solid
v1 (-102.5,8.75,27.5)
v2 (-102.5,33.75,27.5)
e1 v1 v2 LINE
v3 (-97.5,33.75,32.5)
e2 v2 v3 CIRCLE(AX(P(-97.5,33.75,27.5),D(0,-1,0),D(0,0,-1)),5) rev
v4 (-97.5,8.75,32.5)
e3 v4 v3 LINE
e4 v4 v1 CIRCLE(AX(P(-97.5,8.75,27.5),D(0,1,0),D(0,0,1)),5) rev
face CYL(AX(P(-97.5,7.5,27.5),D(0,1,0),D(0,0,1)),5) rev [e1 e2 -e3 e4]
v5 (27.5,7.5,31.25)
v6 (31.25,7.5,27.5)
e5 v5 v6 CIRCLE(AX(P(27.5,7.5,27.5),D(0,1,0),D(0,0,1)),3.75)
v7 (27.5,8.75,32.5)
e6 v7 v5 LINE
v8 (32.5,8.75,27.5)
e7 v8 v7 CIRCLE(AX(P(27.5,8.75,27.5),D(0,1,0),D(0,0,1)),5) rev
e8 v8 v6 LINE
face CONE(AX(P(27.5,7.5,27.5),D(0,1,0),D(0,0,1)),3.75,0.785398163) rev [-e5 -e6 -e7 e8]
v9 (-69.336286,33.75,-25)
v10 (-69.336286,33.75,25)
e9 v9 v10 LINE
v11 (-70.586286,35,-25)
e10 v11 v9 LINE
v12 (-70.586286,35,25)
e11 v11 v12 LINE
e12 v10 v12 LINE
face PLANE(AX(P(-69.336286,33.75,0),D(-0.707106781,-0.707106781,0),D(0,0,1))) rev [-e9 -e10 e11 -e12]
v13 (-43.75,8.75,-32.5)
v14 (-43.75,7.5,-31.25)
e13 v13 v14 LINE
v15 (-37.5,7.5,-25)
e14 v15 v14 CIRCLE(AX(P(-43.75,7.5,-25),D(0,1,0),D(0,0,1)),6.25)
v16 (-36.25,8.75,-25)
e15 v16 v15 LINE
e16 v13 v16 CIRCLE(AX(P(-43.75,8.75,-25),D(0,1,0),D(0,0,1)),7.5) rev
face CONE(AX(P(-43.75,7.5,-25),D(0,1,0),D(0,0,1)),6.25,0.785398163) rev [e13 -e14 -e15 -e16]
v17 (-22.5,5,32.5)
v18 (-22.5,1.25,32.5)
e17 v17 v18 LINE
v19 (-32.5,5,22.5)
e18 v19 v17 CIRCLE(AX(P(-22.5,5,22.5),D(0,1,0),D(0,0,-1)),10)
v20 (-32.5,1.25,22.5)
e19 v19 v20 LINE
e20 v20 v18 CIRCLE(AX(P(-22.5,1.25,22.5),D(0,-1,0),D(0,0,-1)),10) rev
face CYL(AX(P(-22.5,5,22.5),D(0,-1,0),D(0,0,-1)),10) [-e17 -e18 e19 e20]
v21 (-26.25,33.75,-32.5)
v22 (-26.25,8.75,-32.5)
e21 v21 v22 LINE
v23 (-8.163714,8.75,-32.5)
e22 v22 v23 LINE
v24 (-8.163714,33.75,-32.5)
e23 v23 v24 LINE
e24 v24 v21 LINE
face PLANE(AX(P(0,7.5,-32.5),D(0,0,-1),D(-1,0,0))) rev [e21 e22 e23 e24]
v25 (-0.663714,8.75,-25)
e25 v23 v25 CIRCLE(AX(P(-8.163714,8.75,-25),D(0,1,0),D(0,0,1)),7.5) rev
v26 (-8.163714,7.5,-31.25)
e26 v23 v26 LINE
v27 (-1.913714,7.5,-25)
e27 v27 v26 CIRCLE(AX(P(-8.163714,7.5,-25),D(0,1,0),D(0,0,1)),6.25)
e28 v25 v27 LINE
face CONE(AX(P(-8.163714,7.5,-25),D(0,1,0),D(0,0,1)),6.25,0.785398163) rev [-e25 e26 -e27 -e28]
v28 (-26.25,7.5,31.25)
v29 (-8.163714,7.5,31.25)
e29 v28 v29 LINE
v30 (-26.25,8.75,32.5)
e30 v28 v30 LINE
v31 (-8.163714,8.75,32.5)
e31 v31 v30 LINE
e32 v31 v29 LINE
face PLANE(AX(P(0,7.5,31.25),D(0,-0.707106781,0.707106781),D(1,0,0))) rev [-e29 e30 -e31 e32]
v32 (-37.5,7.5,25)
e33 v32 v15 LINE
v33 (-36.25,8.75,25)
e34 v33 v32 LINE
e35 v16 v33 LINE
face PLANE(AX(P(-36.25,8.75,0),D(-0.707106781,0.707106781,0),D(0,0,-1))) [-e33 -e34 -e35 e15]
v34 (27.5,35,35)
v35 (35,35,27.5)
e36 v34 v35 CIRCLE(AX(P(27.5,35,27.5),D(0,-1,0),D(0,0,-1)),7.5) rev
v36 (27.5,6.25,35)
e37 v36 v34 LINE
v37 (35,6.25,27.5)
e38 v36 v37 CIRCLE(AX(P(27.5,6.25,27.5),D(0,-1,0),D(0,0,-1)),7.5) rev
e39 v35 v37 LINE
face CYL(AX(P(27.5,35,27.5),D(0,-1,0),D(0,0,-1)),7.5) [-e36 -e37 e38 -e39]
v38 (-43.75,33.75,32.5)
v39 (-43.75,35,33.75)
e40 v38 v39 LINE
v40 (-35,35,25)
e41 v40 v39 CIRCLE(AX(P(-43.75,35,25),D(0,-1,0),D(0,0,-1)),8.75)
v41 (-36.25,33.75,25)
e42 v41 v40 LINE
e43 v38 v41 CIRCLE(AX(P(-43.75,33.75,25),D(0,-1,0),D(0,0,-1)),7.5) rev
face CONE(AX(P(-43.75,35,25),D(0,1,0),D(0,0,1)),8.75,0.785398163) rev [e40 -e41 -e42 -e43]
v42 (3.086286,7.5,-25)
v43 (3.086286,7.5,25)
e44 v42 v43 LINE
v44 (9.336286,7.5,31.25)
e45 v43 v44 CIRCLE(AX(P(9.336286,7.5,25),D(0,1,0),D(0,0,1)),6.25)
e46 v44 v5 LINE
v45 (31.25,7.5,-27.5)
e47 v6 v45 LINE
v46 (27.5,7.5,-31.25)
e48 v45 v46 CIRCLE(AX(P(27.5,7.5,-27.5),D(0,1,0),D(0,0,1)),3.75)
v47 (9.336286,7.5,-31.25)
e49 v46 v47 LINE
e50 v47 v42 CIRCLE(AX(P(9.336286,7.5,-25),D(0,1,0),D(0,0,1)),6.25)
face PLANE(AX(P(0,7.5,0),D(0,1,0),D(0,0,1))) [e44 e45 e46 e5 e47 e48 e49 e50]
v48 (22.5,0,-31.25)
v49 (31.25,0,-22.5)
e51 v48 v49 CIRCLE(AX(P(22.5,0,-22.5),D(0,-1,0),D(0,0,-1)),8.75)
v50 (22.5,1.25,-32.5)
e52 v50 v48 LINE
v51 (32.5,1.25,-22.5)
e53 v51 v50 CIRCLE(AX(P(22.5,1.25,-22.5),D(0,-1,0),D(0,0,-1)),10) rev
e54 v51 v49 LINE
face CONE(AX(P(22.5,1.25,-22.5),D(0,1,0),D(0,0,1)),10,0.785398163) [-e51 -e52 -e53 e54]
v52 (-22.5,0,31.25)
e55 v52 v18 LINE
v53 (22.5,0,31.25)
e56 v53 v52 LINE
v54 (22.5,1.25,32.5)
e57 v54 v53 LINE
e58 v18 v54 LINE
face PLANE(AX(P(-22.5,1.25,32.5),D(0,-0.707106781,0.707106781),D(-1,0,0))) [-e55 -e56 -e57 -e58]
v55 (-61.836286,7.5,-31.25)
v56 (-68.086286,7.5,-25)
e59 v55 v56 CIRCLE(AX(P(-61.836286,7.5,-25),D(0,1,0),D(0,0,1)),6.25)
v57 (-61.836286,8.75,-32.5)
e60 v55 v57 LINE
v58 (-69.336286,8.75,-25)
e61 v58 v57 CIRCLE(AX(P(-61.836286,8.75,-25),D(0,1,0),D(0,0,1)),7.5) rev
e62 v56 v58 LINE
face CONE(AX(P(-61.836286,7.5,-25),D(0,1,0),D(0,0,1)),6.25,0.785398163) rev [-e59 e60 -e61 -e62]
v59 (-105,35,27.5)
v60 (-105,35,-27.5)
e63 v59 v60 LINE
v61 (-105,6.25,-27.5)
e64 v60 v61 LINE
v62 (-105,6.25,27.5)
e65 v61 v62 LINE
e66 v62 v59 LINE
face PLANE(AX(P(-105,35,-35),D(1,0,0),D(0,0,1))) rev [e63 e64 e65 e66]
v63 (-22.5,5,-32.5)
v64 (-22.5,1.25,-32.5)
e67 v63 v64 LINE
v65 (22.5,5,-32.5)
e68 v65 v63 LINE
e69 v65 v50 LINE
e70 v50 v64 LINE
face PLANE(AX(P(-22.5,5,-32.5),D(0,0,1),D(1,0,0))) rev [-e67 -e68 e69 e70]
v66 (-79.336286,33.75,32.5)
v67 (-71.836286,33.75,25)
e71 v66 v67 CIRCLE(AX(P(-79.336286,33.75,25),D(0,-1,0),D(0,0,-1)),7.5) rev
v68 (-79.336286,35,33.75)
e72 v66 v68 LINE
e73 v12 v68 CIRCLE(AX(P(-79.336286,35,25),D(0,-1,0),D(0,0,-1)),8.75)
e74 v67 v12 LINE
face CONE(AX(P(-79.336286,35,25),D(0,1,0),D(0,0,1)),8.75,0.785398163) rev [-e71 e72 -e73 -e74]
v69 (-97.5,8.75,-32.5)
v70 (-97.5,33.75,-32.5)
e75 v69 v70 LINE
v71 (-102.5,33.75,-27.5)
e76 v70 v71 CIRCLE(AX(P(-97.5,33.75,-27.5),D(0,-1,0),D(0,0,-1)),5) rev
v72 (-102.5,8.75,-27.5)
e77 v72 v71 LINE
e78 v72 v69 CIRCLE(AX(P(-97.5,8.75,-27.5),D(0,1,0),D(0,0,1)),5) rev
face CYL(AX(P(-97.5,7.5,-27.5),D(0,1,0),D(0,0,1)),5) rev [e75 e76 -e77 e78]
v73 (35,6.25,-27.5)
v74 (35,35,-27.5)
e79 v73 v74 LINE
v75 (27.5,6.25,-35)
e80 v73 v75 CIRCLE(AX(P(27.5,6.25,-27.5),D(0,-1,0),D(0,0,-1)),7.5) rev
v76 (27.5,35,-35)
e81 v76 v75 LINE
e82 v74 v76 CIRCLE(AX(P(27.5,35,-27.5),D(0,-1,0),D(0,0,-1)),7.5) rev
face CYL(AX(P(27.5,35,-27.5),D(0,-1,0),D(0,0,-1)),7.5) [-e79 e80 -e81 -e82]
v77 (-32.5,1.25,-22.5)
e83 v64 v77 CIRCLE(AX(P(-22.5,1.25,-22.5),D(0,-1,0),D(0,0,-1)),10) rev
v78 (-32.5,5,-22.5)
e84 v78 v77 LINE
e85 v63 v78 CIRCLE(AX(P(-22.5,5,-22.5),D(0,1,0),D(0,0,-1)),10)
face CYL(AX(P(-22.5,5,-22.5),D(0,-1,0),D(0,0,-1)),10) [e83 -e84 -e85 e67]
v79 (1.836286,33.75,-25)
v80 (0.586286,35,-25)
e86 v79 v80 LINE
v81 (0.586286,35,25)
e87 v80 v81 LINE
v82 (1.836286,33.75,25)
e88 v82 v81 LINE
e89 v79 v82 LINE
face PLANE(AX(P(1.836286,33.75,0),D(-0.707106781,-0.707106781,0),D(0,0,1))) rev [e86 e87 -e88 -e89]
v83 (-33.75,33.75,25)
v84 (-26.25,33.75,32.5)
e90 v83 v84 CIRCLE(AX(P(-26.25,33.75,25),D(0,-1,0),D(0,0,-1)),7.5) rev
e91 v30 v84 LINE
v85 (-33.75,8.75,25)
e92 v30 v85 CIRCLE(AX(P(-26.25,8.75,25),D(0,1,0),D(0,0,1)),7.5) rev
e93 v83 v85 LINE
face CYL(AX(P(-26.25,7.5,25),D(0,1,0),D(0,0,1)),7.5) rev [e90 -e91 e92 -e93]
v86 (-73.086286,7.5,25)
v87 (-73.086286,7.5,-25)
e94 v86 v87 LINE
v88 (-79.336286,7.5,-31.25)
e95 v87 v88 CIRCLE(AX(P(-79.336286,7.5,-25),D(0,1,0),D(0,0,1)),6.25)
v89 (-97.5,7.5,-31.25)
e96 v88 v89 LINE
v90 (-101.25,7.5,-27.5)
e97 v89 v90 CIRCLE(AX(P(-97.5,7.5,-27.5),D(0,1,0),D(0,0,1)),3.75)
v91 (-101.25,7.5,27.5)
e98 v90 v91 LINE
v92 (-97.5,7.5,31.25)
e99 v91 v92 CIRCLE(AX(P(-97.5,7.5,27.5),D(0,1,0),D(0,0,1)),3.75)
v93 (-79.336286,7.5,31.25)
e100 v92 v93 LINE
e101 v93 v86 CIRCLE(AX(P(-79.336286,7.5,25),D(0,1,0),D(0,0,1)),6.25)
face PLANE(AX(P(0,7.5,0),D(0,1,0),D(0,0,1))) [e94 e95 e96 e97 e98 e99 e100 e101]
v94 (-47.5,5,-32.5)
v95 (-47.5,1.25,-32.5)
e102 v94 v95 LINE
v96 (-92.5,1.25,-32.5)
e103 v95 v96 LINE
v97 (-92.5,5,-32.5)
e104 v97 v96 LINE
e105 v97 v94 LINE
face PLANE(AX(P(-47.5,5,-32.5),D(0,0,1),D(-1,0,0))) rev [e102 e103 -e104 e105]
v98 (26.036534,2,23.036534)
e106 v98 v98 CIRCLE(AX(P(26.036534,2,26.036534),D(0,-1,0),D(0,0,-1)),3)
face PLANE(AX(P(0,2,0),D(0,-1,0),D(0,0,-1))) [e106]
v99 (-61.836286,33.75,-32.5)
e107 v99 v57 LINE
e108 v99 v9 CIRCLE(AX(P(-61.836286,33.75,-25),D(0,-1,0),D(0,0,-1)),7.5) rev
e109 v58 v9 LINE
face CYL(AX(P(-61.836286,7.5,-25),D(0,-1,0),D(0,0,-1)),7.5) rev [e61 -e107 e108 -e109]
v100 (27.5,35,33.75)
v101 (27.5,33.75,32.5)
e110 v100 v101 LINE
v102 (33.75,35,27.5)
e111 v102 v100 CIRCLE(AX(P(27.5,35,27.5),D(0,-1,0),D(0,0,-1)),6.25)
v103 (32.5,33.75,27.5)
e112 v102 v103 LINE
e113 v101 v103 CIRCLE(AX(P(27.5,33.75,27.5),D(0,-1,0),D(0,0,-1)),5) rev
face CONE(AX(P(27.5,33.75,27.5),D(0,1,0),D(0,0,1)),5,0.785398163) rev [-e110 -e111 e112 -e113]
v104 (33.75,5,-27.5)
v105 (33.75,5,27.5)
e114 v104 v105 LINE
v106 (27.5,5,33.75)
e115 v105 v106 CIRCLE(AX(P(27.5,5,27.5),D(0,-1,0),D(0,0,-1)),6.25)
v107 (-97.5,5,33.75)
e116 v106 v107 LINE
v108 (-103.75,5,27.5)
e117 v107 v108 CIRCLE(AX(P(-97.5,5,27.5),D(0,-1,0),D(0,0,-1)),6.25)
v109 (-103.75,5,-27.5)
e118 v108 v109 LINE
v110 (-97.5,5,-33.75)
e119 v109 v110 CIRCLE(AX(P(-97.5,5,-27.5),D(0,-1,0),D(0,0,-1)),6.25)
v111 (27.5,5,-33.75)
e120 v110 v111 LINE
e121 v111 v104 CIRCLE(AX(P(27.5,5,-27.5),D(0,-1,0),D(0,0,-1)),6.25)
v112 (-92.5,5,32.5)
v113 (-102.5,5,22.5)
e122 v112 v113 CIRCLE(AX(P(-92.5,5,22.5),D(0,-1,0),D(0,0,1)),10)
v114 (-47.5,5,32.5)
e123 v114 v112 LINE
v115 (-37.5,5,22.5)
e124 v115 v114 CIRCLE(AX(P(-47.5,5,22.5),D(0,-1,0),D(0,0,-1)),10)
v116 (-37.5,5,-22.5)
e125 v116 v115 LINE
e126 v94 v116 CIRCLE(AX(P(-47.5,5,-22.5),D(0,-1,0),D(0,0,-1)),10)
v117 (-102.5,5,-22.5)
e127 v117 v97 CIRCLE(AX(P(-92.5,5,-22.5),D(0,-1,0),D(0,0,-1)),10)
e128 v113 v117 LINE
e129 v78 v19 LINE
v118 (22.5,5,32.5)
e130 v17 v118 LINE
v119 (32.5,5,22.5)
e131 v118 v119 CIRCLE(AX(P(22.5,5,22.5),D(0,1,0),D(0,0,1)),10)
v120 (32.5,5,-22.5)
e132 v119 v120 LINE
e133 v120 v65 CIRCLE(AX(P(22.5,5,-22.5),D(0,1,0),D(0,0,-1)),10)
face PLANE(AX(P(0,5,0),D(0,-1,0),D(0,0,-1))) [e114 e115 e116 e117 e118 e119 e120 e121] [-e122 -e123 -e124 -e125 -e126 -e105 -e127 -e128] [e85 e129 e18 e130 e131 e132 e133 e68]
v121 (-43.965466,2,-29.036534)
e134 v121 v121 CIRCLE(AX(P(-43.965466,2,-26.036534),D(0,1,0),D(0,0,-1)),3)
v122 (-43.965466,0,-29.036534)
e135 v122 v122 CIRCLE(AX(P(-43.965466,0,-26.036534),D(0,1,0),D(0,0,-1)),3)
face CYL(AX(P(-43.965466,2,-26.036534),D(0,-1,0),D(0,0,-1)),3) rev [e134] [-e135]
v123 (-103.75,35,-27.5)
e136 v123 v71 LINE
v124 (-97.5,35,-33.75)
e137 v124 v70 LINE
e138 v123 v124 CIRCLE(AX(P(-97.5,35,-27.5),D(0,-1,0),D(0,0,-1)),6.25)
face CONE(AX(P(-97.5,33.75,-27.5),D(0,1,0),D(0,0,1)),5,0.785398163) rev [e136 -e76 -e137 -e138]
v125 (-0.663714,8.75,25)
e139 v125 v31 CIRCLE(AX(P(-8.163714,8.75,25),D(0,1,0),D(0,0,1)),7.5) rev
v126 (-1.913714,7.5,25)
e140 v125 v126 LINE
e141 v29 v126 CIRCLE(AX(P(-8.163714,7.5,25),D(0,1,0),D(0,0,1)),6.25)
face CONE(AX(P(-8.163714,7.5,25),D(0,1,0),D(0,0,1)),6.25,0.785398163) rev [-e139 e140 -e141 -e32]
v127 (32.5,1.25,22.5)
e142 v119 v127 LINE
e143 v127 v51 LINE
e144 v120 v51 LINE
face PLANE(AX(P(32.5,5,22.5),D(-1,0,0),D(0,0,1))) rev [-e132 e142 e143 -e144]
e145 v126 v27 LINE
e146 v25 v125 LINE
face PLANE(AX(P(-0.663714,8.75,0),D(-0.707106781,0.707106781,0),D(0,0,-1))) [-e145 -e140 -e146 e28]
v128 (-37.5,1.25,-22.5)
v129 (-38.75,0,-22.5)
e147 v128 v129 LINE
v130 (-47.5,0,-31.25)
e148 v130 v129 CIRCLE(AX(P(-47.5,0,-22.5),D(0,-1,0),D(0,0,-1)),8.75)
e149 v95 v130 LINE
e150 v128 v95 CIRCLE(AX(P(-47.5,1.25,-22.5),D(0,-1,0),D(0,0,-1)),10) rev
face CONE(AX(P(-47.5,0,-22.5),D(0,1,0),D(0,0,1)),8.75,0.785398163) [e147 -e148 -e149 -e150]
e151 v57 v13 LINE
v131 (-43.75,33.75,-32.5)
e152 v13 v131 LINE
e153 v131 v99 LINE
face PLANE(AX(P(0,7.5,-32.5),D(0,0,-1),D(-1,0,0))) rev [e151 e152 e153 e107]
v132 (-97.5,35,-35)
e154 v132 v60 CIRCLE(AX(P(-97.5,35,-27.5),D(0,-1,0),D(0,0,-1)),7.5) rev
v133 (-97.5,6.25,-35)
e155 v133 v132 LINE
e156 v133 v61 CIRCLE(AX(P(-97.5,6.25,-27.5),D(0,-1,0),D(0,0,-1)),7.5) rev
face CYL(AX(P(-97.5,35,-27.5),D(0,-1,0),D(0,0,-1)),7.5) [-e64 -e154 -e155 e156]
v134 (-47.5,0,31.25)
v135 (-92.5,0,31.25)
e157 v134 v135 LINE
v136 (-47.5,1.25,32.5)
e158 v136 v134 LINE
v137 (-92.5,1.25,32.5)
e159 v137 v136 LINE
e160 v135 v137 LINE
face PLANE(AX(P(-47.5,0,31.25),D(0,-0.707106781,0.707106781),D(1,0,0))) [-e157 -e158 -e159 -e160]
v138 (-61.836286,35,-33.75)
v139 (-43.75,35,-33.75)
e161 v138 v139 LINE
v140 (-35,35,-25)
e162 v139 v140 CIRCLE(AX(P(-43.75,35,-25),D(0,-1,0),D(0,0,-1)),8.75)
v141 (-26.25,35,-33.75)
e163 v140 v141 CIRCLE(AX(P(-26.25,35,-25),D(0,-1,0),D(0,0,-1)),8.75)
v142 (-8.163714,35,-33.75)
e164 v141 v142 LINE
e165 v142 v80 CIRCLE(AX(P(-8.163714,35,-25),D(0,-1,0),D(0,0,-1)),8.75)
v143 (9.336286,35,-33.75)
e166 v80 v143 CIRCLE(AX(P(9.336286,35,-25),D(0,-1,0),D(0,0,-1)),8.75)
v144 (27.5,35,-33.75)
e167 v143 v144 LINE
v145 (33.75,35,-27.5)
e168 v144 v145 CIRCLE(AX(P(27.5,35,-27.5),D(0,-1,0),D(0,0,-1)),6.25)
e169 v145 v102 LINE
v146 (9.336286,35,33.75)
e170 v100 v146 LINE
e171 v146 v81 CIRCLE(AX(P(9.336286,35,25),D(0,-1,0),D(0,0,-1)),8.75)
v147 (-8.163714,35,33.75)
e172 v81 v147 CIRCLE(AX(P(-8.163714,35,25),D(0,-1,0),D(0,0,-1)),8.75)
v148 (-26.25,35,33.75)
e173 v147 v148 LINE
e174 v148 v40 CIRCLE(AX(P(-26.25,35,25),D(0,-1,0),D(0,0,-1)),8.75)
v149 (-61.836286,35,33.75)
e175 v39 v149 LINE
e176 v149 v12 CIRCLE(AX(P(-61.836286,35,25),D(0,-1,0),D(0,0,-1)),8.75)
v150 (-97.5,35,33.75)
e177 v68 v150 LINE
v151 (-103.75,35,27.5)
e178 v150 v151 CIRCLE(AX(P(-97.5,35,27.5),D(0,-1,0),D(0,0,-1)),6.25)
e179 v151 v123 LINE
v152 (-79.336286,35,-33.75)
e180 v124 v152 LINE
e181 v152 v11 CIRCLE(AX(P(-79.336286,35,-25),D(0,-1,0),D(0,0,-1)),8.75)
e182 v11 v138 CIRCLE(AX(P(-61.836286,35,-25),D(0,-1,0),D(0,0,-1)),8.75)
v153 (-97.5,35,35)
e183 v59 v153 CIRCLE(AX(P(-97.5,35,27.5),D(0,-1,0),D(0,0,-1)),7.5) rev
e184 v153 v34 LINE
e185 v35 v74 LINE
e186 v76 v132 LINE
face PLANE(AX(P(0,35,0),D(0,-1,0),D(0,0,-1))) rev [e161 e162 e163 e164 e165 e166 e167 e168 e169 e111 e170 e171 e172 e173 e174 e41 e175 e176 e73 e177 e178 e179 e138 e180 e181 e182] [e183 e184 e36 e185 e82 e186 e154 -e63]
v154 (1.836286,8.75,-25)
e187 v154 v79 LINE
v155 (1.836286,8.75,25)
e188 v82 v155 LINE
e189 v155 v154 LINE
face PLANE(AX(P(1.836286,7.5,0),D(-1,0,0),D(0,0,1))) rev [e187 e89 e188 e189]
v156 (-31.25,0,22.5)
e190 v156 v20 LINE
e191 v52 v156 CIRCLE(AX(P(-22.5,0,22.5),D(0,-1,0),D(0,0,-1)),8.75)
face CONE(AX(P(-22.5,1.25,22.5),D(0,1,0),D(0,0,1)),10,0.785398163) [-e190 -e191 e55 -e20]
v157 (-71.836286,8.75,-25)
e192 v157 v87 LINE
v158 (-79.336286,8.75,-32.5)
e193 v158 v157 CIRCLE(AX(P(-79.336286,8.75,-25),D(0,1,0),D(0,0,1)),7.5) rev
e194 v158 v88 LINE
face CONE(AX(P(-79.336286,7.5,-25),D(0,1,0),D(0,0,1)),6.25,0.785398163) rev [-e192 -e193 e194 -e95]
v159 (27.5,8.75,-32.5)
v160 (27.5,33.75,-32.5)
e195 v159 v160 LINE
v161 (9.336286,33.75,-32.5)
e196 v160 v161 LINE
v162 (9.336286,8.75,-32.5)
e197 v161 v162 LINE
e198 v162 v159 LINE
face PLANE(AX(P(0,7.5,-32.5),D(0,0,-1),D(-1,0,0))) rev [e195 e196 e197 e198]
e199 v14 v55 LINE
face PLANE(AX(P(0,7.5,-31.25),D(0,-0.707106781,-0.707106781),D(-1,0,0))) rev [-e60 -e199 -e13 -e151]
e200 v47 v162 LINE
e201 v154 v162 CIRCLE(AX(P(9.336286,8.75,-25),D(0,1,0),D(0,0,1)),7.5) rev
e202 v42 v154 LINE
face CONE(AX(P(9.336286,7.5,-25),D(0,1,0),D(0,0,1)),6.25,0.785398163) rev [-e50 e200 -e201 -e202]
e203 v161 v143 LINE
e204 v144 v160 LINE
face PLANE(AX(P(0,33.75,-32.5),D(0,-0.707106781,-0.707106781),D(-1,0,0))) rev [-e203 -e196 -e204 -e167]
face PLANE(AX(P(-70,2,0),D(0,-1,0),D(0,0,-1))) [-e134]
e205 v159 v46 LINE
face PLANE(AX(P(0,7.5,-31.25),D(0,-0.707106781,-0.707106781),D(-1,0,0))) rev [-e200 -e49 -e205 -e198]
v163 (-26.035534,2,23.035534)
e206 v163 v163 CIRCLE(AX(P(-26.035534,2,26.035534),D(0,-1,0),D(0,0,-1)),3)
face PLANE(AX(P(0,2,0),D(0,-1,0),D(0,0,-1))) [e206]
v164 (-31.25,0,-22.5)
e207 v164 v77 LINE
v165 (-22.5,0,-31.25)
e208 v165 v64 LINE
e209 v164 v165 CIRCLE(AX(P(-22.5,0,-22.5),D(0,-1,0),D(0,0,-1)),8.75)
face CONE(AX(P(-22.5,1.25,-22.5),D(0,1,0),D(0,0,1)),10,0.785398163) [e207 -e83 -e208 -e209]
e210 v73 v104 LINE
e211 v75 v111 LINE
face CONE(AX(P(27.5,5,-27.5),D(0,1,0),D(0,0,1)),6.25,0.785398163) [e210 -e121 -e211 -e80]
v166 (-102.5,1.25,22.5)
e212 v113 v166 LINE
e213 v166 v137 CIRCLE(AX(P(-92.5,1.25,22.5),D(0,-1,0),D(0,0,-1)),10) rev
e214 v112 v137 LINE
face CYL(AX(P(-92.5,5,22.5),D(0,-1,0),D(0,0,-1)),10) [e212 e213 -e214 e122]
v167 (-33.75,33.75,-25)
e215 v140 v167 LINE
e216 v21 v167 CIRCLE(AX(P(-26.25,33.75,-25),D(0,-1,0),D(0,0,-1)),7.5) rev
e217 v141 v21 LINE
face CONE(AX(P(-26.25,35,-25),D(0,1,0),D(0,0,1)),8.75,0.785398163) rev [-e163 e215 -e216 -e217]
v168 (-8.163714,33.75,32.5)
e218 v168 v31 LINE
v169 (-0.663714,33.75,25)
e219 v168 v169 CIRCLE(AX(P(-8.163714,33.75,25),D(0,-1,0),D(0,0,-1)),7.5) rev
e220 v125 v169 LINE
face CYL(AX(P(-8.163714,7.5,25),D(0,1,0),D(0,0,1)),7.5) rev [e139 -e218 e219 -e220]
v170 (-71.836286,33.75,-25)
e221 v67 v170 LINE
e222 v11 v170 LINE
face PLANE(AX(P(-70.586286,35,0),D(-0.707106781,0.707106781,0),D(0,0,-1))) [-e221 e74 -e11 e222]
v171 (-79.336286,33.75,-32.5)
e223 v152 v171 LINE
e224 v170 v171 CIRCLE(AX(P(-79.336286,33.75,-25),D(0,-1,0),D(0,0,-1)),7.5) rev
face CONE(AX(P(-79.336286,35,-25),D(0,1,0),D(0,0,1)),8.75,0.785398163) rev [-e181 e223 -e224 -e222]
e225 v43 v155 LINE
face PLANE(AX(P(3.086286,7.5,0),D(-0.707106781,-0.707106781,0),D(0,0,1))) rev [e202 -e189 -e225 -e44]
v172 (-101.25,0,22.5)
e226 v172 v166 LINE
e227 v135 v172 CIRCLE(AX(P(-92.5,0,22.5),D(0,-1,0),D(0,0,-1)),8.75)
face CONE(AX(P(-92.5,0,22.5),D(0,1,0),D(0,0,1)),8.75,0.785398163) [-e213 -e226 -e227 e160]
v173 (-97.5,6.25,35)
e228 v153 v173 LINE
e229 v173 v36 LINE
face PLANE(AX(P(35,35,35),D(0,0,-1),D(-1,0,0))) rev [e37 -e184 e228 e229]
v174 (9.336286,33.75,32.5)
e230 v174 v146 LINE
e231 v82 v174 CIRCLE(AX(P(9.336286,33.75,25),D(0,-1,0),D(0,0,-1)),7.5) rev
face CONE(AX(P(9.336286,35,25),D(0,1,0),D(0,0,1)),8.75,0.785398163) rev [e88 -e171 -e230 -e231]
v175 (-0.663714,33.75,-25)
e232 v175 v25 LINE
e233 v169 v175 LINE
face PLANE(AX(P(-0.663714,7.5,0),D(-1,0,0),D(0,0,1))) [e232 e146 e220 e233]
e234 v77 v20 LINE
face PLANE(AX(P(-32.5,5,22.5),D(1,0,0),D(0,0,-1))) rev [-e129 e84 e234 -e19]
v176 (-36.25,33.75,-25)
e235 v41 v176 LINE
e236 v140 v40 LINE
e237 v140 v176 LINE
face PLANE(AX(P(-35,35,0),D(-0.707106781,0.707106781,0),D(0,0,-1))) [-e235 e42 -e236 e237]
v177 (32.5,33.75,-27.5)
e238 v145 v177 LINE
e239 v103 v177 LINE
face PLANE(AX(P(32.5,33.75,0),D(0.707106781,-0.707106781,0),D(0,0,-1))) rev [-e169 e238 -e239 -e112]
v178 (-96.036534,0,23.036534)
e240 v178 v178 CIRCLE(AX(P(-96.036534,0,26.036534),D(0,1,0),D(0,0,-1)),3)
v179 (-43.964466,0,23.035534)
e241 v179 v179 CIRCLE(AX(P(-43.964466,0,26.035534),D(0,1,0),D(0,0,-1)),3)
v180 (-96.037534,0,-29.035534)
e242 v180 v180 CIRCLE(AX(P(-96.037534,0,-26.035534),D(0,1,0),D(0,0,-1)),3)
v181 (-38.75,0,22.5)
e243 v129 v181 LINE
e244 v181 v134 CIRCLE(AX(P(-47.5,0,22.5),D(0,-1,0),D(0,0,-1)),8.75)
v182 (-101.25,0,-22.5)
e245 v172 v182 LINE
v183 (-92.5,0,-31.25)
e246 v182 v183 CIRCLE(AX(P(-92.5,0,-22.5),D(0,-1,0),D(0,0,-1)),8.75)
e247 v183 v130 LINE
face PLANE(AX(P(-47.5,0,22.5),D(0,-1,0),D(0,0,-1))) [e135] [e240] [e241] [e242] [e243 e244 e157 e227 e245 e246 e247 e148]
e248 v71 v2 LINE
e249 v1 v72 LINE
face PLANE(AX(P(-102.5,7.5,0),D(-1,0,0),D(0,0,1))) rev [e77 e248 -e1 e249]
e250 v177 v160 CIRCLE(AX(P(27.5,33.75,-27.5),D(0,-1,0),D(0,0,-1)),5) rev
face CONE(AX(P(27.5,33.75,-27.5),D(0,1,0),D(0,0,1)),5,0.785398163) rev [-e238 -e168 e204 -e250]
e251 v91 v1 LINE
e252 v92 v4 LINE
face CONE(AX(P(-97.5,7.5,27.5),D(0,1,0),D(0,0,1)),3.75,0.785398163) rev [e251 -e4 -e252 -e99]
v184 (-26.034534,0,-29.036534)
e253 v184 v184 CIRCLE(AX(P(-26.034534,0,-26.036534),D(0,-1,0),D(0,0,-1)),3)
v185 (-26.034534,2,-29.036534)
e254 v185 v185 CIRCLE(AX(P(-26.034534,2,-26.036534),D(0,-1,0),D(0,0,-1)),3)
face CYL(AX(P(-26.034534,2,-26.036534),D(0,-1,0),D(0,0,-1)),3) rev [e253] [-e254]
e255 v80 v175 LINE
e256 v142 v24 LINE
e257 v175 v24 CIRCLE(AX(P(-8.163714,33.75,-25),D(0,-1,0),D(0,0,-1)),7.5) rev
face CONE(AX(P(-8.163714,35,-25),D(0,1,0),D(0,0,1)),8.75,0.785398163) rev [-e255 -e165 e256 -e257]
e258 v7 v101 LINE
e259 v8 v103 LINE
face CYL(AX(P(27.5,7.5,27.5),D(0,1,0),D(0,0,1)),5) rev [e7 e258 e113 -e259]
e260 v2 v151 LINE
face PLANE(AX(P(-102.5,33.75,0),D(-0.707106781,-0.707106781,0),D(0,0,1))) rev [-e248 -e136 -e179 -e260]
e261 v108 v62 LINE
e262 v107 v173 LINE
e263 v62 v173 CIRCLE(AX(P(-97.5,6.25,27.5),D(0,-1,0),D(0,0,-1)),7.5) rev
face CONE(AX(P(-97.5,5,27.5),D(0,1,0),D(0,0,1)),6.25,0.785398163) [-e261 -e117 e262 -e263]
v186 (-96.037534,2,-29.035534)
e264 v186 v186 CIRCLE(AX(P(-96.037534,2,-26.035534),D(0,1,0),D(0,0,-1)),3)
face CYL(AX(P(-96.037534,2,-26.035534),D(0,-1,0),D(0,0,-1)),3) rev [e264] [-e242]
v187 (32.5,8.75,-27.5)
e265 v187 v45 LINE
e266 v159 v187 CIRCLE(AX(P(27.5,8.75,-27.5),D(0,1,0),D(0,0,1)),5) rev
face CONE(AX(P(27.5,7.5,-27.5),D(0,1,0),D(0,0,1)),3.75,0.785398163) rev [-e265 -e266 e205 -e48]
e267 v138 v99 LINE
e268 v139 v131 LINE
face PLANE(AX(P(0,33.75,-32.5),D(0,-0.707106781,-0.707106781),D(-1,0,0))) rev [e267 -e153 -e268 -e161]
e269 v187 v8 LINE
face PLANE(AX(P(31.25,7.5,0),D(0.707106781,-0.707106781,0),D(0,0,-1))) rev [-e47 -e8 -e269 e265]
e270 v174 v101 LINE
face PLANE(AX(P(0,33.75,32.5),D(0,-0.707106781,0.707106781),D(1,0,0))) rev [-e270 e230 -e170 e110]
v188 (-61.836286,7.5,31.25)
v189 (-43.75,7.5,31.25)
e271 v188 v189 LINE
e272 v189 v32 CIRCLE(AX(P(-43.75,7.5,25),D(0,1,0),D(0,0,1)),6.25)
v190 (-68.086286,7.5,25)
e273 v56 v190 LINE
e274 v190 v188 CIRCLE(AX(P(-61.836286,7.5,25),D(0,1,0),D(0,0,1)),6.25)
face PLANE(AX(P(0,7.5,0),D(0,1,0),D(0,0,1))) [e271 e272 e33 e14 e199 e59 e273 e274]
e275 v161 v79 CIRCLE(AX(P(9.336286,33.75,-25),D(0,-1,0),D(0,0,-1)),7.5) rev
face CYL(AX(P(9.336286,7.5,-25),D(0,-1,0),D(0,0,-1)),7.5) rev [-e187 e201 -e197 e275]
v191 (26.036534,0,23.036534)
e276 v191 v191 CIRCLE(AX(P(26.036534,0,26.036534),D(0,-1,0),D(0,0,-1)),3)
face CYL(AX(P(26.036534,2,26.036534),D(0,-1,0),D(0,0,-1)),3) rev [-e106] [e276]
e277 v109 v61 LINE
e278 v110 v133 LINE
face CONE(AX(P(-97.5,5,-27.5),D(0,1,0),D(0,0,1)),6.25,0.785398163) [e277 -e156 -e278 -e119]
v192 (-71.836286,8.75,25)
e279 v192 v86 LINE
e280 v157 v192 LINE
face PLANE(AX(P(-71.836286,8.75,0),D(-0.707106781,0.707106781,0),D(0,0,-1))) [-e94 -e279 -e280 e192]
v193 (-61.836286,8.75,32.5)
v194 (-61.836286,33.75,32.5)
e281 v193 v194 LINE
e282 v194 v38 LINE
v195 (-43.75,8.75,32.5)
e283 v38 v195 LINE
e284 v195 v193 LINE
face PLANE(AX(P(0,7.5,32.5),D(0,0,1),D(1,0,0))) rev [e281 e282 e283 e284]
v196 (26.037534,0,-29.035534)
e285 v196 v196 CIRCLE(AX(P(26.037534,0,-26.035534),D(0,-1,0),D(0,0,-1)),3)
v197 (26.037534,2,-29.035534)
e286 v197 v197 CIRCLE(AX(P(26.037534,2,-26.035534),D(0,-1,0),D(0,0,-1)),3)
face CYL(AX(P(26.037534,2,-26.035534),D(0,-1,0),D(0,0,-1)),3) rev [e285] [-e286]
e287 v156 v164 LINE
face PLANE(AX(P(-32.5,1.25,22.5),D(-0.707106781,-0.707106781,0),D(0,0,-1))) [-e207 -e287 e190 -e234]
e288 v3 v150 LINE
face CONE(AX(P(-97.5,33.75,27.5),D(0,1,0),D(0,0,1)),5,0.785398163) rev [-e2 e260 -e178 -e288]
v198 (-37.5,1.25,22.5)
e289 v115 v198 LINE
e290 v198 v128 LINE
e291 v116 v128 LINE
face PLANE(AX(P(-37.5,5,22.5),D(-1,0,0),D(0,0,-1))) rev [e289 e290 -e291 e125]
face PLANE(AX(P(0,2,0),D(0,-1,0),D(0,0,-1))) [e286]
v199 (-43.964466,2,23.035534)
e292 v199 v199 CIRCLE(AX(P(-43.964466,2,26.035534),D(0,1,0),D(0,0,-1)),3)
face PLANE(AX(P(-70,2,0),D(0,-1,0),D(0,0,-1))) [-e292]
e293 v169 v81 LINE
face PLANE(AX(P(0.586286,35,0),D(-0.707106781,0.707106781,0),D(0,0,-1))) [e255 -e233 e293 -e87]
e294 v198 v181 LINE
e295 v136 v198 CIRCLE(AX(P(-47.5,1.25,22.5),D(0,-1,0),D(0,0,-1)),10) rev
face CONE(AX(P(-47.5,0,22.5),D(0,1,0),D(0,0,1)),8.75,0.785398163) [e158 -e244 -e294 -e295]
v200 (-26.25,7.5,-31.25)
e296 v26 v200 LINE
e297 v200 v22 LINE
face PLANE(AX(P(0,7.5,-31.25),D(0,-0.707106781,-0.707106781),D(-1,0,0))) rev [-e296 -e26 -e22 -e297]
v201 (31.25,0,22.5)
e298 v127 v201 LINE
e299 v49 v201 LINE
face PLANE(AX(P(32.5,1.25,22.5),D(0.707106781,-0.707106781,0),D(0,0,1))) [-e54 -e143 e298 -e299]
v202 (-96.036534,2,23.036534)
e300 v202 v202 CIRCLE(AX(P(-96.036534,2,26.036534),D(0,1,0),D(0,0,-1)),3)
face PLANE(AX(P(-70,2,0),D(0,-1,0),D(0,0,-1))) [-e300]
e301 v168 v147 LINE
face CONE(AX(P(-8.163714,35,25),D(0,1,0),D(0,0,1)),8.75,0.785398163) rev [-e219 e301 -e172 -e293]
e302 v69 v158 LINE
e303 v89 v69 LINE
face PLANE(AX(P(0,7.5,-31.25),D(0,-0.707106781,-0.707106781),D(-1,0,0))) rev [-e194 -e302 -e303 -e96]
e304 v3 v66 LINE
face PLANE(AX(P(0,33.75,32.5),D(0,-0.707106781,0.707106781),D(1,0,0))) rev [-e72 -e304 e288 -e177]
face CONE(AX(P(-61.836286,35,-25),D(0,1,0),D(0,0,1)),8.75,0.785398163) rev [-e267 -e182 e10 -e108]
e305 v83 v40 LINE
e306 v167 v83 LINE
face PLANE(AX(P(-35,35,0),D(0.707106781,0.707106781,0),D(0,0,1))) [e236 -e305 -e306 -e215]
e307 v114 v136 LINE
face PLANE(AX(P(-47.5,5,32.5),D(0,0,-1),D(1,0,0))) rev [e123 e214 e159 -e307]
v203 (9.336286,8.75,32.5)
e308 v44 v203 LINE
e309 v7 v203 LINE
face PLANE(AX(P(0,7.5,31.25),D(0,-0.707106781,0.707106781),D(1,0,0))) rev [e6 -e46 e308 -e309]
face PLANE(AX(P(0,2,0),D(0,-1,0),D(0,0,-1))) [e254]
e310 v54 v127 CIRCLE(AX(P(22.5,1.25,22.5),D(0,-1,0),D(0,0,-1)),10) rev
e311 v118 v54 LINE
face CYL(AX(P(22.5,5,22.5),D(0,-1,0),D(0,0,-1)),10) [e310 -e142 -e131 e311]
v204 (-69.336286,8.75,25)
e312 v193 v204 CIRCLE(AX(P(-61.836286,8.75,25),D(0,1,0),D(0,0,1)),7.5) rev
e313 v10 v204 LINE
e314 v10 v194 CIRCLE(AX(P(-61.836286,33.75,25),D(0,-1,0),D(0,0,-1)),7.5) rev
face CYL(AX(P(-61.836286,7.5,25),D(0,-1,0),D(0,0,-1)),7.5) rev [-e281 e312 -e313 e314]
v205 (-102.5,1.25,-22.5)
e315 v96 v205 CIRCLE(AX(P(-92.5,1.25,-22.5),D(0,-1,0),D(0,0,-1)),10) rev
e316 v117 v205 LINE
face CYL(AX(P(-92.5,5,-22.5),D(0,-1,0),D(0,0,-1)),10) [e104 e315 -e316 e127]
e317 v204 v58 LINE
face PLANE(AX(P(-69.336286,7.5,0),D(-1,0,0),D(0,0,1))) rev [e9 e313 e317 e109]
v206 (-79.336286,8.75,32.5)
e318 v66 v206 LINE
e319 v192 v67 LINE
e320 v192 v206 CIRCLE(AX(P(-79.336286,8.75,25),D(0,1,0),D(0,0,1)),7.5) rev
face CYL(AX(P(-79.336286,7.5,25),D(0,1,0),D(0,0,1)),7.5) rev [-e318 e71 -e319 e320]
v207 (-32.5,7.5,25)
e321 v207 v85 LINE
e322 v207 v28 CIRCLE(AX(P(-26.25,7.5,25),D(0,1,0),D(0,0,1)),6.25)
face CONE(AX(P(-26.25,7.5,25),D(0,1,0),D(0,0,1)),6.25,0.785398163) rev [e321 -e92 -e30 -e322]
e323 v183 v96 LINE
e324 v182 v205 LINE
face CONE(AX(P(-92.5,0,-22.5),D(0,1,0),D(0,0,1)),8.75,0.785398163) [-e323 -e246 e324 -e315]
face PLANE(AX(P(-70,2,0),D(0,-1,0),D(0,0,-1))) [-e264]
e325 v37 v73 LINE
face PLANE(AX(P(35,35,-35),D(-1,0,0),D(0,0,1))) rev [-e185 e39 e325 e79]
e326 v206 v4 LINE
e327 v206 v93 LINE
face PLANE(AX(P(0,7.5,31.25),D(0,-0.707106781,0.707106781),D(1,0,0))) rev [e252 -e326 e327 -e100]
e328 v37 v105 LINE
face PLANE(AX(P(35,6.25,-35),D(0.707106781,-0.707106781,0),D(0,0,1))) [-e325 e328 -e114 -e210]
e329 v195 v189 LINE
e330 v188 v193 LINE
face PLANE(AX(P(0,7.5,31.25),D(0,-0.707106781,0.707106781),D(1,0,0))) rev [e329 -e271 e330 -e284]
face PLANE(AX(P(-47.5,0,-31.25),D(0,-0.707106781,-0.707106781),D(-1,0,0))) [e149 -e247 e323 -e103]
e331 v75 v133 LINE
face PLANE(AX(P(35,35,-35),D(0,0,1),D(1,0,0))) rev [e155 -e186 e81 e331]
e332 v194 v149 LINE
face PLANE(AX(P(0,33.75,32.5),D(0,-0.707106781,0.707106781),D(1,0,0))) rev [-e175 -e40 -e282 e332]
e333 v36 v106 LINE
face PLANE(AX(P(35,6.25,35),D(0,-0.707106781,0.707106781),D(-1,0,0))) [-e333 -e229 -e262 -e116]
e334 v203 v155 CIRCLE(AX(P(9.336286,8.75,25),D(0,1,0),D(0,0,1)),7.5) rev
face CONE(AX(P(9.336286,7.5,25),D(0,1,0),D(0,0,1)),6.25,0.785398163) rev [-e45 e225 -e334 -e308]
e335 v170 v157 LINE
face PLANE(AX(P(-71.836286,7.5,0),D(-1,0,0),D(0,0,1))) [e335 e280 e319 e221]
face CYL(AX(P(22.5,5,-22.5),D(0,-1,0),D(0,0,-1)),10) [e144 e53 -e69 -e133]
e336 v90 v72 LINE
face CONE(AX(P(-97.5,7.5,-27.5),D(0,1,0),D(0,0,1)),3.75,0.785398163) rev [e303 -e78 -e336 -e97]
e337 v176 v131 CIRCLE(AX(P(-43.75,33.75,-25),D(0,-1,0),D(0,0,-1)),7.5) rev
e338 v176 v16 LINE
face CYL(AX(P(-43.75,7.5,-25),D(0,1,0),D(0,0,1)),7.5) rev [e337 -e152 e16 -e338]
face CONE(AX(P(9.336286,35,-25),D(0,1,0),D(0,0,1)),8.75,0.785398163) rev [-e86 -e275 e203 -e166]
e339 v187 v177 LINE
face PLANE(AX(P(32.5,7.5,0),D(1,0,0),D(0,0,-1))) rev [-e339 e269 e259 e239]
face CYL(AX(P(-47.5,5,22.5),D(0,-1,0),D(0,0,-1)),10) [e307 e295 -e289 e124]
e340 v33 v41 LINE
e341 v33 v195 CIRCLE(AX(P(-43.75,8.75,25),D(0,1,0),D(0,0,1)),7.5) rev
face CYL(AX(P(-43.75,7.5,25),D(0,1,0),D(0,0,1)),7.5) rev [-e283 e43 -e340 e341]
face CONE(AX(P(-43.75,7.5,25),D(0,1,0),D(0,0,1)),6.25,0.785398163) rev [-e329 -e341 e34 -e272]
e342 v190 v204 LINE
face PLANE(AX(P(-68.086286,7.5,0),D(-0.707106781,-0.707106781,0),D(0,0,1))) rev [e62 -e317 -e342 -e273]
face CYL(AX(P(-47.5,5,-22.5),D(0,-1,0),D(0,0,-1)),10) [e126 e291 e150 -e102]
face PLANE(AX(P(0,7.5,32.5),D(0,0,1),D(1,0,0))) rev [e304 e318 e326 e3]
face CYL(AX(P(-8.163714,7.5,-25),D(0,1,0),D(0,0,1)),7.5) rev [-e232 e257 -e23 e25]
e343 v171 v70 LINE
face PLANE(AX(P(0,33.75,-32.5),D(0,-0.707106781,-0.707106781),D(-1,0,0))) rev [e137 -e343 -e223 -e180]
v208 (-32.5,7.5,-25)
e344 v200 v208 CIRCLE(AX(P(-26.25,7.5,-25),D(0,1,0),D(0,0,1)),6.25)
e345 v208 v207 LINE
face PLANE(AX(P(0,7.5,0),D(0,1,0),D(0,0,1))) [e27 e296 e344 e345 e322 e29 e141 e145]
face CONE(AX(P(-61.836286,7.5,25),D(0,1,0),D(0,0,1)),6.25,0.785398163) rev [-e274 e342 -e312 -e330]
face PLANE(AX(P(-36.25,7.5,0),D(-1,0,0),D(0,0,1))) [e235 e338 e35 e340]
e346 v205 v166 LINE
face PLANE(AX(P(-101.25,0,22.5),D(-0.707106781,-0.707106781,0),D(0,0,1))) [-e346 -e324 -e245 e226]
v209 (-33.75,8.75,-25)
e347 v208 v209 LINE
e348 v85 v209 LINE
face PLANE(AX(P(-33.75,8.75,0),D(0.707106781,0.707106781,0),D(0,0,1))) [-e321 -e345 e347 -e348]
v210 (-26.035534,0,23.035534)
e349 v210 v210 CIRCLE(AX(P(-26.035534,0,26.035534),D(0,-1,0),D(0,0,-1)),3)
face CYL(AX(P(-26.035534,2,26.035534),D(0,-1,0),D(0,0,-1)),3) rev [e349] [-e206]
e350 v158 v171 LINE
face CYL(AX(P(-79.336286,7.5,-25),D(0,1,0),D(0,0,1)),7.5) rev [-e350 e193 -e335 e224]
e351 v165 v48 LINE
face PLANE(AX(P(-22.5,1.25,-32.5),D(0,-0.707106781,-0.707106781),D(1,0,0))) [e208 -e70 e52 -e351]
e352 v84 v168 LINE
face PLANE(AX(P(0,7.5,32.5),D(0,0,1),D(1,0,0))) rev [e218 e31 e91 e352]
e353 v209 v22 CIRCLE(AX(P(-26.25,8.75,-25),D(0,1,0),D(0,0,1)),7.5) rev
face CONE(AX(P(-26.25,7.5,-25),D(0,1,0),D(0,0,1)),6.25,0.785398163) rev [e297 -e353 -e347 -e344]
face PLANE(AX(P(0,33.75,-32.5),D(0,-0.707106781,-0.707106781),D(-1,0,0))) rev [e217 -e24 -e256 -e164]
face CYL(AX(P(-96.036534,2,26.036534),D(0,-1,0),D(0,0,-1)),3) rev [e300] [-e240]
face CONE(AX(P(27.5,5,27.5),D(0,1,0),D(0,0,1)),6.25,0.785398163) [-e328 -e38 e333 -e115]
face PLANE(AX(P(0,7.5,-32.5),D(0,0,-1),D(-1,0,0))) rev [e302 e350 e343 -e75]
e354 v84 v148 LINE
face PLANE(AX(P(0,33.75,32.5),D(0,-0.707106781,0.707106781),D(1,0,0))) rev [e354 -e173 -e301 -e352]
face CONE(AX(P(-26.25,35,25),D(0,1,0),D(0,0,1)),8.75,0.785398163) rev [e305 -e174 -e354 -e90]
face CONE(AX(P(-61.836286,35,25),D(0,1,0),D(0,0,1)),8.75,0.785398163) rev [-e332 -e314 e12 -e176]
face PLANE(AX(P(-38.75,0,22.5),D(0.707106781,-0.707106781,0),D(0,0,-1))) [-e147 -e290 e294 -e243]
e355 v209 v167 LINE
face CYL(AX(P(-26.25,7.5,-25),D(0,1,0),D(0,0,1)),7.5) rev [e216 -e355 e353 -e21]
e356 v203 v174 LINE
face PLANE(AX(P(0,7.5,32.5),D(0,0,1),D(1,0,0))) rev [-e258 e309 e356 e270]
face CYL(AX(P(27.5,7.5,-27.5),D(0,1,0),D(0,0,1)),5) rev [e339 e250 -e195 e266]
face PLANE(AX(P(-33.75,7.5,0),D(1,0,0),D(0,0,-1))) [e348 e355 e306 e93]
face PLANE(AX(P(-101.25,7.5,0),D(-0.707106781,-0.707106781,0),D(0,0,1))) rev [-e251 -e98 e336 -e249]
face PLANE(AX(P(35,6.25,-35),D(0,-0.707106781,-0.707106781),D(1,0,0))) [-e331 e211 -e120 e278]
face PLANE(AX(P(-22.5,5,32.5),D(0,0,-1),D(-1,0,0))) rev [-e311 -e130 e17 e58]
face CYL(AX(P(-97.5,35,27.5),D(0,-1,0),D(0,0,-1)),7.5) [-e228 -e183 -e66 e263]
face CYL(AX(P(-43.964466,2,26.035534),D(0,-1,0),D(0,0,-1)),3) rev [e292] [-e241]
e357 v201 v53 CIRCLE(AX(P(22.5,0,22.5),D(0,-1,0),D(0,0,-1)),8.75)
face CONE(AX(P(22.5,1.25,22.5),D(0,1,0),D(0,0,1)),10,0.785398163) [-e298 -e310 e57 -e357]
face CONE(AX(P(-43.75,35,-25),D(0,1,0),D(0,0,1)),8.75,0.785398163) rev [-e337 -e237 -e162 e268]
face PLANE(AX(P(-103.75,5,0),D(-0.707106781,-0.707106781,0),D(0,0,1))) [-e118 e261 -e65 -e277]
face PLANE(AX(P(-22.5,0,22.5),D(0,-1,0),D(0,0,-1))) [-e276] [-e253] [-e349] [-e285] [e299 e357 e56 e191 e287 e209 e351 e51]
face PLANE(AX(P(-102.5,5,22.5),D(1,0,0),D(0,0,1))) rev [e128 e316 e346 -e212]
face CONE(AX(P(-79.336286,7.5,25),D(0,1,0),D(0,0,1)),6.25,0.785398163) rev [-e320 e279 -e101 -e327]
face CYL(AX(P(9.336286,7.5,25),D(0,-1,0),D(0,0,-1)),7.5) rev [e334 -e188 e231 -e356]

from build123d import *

# Parameters (mm, degrees)
BOSS_EXTRUDE4_DEPTH = 5
SKETCH6_W           = 70
SKETCH6_H           = 70
BOSS_EXTRUDE5_DEPTH = 30
SKETCH8_R           = 3
CUT_EXTRUDE1_DEPTH  = 2
FILLET1_R           = 7.5
SKETCH13_W          = 33.08628573
SKETCH13_H          = 65
CUT_EXTRUDE2_DEPTH  = 27.5
FILLET2_R           = 7.5
CHAMFER1_SIZE       = 1.25
CHAMFER2_SIZE       = 1.25


with BuildPart() as part:
    # Sketch5 → Boss-Extrude4 (new body)
    with BuildSketch(Plane(origin=(0, 0, 0), x_dir=(1, 0, 0), z_dir=(0, 1, 0))):
        with BuildLine():
            Line((-22.5, -32.5), (22.5, -32.5))
            ThreePointArc((22.5, -32.5), (29.571067812, -29.571067812), (32.5, -22.5))
            Line((32.5, -22.5), (32.5, 22.5))
            ThreePointArc((32.5, 22.5), (29.571067812, 29.571067812), (22.5, 32.5))
            Line((22.5, 32.5), (-22.5, 32.5))
            ThreePointArc((-22.5, 32.5), (-29.571067812, 29.571067812), (-32.5, 22.5))
            Line((-32.5, 22.5), (-32.5, -22.5))
            ThreePointArc((-32.5, -22.5), (-29.571067812, -29.571067812), (-22.5, -32.5))
        make_face()
    extrude(amount=BOSS_EXTRUDE4_DEPTH)

    # Sketch6 → Boss-Extrude5 (add)
    with BuildSketch(Plane(origin=(0, 5, 0), x_dir=(1, 0, 0), z_dir=(0, 1, 0))):
        Rectangle(SKETCH6_W, SKETCH6_H)
    extrude(amount=BOSS_EXTRUDE5_DEPTH)

    # Sketch8 → Cut-Extrude1 (cut)
    with BuildSketch(Plane.XZ):
        with Locations(Location((26.037533906, -26.035533906, 0), (0, 0, 270))):
            Circle(SKETCH8_R)
        with Locations(Location((26.036533906, 26.036533906, 0), (0, 0, 270))):
            Circle(SKETCH8_R)
        with BuildLine():
            ThreePointArc((-23.035533906, 26.035533906), (-24.887483609, 28.807172503), (-28.156854249, 28.156854249))
            Line((-28.156854249, 28.156854249), (-23.914213562, 23.914213562))
            ThreePointArc((-23.914213562, 23.914213562), (-23.263895308, 24.887483609), (-23.035533906, 26.035533906))
        make_face()
        with BuildLine():
            Line((-23.914213562, 23.914213562), (-28.156854249, 28.156854249))
            ThreePointArc((-28.156854249, 28.156854249), (-28.156854249, 23.914213562), (-23.914213562, 23.914213562))
        make_face()
        with Locations(Location((-26.034533906, -26.036533906, 0), (0, 0, 270))):
            Circle(SKETCH8_R)
    extrude(amount=-CUT_EXTRUDE1_DEPTH, mode=Mode.SUBTRACT)

    # Mirror1: part across plane


with BuildPart() as part_1:
    add(part.part)
    add(part.part.mirror(Plane(origin=(-35, 35, -35), x_dir=(0, 0, 1), z_dir=(1, 0, 0))))

    # Fillet1
    fillet1_edges = [part_1.edges().sort_by_distance(p)[0] for p in [
        (35, 20, 35),
        (35, 20, -35),
        (-105, 20, 35),
        (-105, 20, -35),
    ]]
    fillet(fillet1_edges, radius=FILLET1_R)

    # Sketch13 → Cut-Extrude2 (cut)
    with BuildSketch(Plane(origin=(0, 35, 0), x_dir=(1, 0, 0), z_dir=(0, 1, 0))):
        with BuildLine():
            Line((-97.5, -32.5), (-71.83628573, -32.5))
            Line((-71.83628573, -32.5), (-71.83628573, 32.5))
            Line((-71.83628573, 32.5), (-97.5, 32.5))
            ThreePointArc((-97.5, 32.5), (-101.035533906, 31.035533906), (-102.5, 27.5))
            Line((-102.5, 27.5), (-102.5, -27.5))
            ThreePointArc((-102.5, -27.5), (-101.035533906, -31.035533906), (-97.5, -32.5))
        make_face()
        with Locations((-52.793142865, 0)):
            Rectangle(SKETCH13_W, SKETCH13_H)
        with Locations((-17.206857135, 0)):
            Rectangle(SKETCH13_W, SKETCH13_H)
        with BuildLine():
            Line((1.83628573, 32.5), (1.83628573, -32.5))
            Line((1.83628573, -32.5), (27.5, -32.5))
            ThreePointArc((27.5, -32.5), (31.035533906, -31.035533906), (32.5, -27.5))
            Line((32.5, -27.5), (32.5, 27.5))
            ThreePointArc((32.5, 27.5), (31.035533906, 31.035533906), (27.5, 32.5))
            Line((27.5, 32.5), (1.83628573, 32.5))
        make_face()
    extrude(amount=-CUT_EXTRUDE2_DEPTH, mode=Mode.SUBTRACT)

    # Fillet2
    fillet2_edges = [part_1.edges().sort_by_distance(p)[0] for p in [
        (-71.83628573, 21.25, -32.5),
        (-71.83628573, 21.25, 32.5),
        (-36.25, 21.25, -32.5),
        (-36.25, 21.25, 32.5),
        (-69.33628573, 21.25, 32.5),
        (-69.33628573, 21.25, -32.5),
        (-0.66371427, 21.25, -32.5),
        (-0.66371427, 21.25, 32.5),
        (-33.75, 21.25, 32.5),
        (-33.75, 21.25, -32.5),
        (1.83628573, 21.25, 32.5),
        (1.83628573, 21.25, -32.5),
    ]]
    fillet(fillet2_edges, radius=FILLET2_R)

    # Chamfer1
    chamfer1_edges = [part_1.edges().sort_by_distance(p)[0] for p in [
        (-88.418142865, 7.5, 32.5),
        (-101.035533906, 7.5, 31.035533906),
        (-102.5, 7.5, 0),
        (-101.035533906, 7.5, -31.035533906),
        (-101.035533906, 35, -31.035533906),
        (-102.5, 35, 0),
        (-101.035533906, 35, 31.035533906),
        (-88.418142865, 35, 32.5),
        (18.418142865, 7.5, -32.5),
        (31.035533906, 7.5, -31.035533906),
        (32.5, 7.5, 0),
        (31.035533906, 7.5, 31.035533906),
        (31.035533906, 35, 31.035533906),
        (32.5, 35, 0),
        (31.035533906, 35, -31.035533906),
        (18.418142865, 35, -32.5),
        (-71.83628573, 35, 0),
        (-71.83628573, 7.5, 0),
        (-88.418142865, 7.5, -32.5),
        (-74.032984871, 7.5, -30.303300859),
        (-74.032984871, 7.5, 30.303300859),
        (-36.25, 35, 0),
        (-36.25, 7.5, 0),
        (-52.793142865, 35, 32.5),
        (-52.793142865, 7.5, 32.5),
        (-52.793142865, 7.5, -32.5),
        (-69.33628573, 7.5, 0),
        (-38.446699141, 7.5, -30.303300859),
        (-67.139586589, 7.5, -30.303300859),
        (-67.139586589, 7.5, 30.303300859),
        (-38.446699141, 7.5, 30.303300859),
        (-0.66371427, 35, 0),
        (-0.66371427, 7.5, 0),
        (-17.206857135, 35, 32.5),
        (-17.206857135, 7.5, 32.5),
        (-17.206857135, 7.5, -32.5),
        (-33.75, 7.5, 0),
        (-2.860413411, 7.5, -30.303300859),
        (-31.553300859, 7.5, -30.303300859),
        (-31.553300859, 7.5, 30.303300859),
        (-2.860413411, 7.5, 30.303300859),
        (-69.33628573, 35, 0),
        (-33.75, 35, 0),
        (18.418142865, 35, 32.5),
        (18.418142865, 7.5, 32.5),
        (1.83628573, 35, 0),
        (1.83628573, 7.5, 0),
        (4.032984871, 7.5, -30.303300859),
        (4.032984871, 7.5, 30.303300859),
        (-17.206857135, 35, -32.5),
        (-52.793142865, 35, -32.5),
        (-88.418142865, 35, -32.5),
        (-74.032984871, 35, 30.303300859),
        (-38.446699141, 35, 30.303300859),
        (-2.860413411, 35, 30.303300859),
        (-67.139586589, 35, 30.303300859),
        (-31.553300859, 35, 30.303300859),
        (4.032984871, 35, 30.303300859),
        (4.032984871, 35, -30.303300859),
        (-31.553300859, 35, -30.303300859),
        (-67.139586589, 35, -30.303300859),
        (-2.860413411, 35, -30.303300859),
        (-38.446699141, 35, -30.303300859),
        (-74.032984871, 35, -30.303300859),
    ]]
    chamfer(chamfer1_edges, length=CHAMFER1_SIZE - 0.0001)  # a hair under: the kernel refuses the full size

    # Chamfer2
    chamfer2_edges = [part_1.edges().sort_by_distance(p)[0] for p in [
        (32.5, 0, 0),
        (-35, 5, -35),
        (29.571067812, 0, 29.571067812),
        (-35, 5, 35),
        (-105, 5, 0),
        (35, 5, 0),
        (-102.803300859, 5, -32.803300859),
        (0, 0, 32.5),
        (-102.803300859, 5, 32.803300859),
        (32.803300859, 5, 32.803300859),
        (32.803300859, 5, -32.803300859),
        (-29.571067812, 0, 29.571067812),
        (-40.428932188, 0, 29.571067812),
        (-70, 0, 32.5),
        (-99.571067812, 0, 29.571067812),
        (-102.5, 0, 0),
        (-99.571067812, 0, -29.571067812),
        (-70, 0, -32.5),
        (-40.428932188, 0, -29.571067812),
        (-37.5, 0, 0),
        (-32.5, 0, 0),
        (-29.571067812, 0, -29.571067812),
        (0, 0, -32.5),
        (29.571067812, 0, -29.571067812),
    ]]
    chamfer(chamfer2_edges, length=CHAMFER2_SIZE)


solid = part_1.part
